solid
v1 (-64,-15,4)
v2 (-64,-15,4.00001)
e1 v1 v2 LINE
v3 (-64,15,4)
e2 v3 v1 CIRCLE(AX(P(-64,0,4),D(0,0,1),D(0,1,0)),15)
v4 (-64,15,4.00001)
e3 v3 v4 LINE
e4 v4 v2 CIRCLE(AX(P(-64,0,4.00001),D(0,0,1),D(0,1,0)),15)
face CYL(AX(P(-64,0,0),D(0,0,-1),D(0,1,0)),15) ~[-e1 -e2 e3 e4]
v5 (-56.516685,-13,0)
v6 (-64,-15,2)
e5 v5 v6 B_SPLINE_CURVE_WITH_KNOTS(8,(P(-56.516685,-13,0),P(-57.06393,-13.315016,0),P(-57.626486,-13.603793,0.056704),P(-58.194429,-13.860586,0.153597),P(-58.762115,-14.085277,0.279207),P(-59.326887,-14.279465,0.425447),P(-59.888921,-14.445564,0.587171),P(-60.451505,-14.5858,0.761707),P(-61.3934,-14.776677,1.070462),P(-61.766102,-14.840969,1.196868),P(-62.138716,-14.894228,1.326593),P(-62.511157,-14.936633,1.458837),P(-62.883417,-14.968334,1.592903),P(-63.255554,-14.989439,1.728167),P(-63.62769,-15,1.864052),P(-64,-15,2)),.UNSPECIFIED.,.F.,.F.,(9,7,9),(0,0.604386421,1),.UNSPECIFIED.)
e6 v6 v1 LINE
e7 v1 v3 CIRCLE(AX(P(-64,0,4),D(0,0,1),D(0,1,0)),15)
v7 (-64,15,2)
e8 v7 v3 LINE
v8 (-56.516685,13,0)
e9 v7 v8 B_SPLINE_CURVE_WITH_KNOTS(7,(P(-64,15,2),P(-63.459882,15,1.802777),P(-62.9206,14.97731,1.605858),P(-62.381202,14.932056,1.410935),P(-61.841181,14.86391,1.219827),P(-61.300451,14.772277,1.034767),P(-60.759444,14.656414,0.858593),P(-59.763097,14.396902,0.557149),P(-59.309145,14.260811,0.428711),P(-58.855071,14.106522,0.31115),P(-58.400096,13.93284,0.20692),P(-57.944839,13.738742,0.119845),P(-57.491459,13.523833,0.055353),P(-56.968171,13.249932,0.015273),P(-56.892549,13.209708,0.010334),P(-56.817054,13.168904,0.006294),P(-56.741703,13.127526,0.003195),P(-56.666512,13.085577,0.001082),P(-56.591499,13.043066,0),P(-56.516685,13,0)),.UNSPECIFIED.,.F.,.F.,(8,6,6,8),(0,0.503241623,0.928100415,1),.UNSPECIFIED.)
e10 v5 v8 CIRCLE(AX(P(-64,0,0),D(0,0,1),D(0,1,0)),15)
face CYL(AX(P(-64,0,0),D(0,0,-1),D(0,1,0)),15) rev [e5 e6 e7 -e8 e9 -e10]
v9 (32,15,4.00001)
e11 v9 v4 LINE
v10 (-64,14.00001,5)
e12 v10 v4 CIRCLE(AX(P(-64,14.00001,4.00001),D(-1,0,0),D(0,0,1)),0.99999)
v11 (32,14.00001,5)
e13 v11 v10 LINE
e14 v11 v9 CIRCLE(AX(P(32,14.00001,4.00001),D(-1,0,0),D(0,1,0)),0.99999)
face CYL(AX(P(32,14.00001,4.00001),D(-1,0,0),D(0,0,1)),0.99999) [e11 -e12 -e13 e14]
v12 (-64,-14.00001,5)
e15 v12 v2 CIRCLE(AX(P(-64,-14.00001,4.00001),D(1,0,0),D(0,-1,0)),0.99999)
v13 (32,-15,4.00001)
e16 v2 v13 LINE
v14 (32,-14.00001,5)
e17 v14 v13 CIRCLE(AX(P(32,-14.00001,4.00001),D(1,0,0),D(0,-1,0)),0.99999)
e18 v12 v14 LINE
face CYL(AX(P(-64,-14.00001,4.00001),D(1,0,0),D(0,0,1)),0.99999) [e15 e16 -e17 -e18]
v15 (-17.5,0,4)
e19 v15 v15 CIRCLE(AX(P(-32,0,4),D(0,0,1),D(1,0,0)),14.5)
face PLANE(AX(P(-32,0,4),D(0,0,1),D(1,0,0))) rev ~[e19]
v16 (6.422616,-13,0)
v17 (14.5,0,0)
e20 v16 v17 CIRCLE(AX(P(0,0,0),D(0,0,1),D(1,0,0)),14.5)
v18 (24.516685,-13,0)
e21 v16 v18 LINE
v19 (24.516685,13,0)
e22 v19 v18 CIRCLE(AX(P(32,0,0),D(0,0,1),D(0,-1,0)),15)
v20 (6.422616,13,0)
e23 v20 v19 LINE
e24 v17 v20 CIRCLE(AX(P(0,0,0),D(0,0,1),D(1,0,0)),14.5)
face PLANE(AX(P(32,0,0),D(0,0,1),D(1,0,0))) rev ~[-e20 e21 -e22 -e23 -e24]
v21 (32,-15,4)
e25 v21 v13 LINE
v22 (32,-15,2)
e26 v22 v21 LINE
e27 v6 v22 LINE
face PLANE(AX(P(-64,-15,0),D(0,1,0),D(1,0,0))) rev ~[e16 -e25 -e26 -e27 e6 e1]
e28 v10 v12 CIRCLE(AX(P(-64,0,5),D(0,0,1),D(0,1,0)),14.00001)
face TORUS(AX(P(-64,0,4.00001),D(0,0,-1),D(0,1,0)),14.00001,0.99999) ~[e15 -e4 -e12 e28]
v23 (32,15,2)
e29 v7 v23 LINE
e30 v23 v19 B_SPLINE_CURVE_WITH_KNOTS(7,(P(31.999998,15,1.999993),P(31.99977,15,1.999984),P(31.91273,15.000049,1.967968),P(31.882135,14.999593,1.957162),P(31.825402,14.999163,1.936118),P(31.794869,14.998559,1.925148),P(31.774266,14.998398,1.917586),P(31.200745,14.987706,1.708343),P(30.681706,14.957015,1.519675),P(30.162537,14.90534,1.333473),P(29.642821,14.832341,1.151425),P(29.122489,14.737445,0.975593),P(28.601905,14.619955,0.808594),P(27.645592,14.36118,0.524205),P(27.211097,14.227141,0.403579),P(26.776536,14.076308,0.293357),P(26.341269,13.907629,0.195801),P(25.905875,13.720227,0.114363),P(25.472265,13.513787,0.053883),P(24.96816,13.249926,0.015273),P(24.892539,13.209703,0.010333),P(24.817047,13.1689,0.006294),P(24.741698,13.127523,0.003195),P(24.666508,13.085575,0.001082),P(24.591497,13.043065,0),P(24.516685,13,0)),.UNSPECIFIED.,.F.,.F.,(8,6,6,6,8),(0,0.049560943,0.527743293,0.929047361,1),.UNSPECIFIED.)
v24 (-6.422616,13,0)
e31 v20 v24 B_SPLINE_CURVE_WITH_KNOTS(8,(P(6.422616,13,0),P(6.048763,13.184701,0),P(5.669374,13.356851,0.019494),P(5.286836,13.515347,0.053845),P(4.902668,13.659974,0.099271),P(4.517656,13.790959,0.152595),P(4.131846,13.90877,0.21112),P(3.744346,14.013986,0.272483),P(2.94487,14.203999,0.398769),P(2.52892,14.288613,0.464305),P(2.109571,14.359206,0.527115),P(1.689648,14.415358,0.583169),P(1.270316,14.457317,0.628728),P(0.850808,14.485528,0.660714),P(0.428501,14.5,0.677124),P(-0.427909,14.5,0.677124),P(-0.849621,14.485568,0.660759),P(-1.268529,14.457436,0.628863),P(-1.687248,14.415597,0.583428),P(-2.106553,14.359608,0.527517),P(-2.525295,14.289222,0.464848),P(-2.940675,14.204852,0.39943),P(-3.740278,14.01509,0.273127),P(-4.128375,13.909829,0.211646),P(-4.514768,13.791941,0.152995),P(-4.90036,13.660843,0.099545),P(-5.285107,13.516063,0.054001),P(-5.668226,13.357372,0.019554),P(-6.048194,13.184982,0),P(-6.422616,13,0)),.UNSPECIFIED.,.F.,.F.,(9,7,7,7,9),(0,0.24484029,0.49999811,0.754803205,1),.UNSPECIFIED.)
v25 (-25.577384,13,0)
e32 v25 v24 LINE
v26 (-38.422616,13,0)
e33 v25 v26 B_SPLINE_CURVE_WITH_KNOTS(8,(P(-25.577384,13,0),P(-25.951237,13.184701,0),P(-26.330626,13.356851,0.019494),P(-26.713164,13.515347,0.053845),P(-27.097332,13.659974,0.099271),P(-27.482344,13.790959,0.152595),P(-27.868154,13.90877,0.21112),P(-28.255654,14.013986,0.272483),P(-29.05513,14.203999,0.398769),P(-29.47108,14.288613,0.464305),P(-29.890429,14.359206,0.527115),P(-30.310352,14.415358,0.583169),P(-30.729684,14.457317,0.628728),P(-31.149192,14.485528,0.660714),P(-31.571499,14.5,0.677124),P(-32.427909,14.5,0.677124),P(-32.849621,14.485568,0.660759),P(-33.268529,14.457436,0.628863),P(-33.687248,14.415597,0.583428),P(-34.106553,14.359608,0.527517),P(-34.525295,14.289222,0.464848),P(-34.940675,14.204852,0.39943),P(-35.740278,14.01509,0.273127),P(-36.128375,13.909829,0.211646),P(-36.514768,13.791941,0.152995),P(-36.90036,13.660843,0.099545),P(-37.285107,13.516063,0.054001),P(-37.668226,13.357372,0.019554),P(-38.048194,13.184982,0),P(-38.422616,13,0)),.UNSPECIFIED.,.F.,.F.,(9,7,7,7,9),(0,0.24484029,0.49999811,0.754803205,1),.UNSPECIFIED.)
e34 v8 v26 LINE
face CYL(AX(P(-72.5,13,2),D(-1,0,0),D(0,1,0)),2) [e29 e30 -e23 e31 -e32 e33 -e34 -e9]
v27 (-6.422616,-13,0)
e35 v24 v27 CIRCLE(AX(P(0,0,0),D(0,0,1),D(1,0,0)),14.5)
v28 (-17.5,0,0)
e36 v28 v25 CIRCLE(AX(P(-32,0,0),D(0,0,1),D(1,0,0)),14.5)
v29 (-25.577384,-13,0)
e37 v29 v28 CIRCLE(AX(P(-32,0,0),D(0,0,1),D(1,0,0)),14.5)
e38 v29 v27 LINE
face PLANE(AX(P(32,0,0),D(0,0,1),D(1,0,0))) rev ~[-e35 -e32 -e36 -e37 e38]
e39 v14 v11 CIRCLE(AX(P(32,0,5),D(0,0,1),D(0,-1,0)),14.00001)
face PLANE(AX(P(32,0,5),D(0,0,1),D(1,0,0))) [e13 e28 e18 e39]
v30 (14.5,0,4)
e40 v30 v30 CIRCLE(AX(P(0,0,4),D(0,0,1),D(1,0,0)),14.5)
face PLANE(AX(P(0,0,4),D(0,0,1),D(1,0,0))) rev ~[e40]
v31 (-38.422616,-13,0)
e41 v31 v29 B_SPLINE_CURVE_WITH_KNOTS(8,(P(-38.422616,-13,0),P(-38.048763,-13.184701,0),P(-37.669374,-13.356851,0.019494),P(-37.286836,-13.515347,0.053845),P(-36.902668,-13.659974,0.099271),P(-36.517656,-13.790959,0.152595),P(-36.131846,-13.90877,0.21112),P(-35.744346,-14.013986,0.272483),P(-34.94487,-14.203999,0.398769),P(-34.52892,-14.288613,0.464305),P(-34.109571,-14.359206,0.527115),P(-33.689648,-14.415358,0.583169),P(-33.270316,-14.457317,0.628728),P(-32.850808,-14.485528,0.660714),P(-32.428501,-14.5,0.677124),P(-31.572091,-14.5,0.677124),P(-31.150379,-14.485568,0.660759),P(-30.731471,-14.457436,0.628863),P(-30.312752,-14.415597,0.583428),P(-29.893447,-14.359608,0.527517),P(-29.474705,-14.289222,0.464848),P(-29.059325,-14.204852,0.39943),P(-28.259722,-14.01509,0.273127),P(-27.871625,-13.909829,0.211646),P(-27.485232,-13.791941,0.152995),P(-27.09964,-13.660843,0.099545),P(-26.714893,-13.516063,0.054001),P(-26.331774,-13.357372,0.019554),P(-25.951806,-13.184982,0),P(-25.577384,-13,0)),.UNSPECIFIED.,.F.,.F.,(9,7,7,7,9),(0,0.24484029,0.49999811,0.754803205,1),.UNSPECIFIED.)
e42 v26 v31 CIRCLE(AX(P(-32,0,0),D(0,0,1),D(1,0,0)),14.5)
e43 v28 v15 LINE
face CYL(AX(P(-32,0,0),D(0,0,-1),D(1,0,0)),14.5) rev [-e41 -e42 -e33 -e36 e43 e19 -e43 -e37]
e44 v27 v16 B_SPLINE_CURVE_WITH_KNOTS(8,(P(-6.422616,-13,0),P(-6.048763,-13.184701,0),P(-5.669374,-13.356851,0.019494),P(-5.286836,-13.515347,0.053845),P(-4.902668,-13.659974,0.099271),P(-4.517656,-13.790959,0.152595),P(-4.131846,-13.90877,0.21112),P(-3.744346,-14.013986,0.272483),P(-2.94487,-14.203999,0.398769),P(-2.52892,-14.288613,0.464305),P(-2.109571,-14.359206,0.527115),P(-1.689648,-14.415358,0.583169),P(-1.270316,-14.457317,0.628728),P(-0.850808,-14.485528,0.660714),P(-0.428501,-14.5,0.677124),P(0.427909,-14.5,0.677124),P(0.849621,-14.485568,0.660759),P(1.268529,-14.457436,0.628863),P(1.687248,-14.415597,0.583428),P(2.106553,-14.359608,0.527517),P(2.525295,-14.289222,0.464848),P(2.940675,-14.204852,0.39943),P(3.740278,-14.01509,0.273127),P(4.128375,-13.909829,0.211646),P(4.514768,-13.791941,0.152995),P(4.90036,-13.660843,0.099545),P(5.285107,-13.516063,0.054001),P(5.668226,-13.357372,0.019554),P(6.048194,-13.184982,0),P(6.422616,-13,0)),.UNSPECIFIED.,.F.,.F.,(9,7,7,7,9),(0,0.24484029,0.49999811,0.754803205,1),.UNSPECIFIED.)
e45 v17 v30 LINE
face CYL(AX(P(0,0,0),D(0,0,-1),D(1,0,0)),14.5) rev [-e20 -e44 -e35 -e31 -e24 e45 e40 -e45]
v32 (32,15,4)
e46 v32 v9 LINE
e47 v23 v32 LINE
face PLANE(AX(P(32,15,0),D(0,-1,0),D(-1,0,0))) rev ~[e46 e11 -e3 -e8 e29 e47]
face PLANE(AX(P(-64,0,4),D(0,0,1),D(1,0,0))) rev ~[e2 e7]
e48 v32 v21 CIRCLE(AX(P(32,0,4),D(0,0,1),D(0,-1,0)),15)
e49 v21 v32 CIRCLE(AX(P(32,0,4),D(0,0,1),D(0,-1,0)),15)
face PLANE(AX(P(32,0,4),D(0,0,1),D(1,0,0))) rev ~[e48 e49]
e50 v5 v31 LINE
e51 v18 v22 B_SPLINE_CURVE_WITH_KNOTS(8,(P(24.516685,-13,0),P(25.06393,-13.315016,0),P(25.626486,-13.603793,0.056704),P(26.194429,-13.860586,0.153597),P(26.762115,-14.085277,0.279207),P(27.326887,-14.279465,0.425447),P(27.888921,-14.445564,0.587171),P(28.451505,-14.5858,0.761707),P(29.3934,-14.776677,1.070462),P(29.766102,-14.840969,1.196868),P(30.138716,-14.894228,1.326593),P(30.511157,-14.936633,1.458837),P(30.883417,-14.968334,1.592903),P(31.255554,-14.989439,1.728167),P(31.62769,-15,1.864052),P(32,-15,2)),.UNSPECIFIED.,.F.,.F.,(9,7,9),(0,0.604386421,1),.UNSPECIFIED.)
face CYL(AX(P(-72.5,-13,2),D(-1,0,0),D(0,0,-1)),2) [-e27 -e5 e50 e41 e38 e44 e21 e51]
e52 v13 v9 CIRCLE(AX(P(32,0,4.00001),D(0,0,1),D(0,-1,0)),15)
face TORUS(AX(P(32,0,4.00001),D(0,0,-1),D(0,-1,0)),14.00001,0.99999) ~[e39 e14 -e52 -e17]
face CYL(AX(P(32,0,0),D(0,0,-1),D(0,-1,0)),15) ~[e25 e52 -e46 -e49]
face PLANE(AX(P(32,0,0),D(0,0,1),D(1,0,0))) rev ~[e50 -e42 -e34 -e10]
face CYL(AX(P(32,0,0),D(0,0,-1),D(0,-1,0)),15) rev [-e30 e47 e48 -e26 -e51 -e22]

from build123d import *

# Parameters (mm, degrees)
F0_R        = 14.5
F1_DEPTH    = 5
F2_DEPTH    = 4
F3_T1_DEPTH = 113
F4_R        = 0.99999


# Not quite as in the source:
# - a fillet or chamfer that OpenCascade refuses, or shapes differently, is made with other operations: its cross-section is extruded or revolved along the edge and cut away or added
# - a fillet or chamfer is up to 0.001 mm smaller than in the source, because OpenCascade refuses the exact size


with BuildPart() as f1:
    # F0 (on Top) → F1 (new body)
    with BuildSketch(Plane.XY):
        with BuildLine():
            ThreePointArc((47, 0), (42.6066017178, 10.6066017178), (32, 15))
            ThreePointArc((32, 15), (17, 0), (32, -15))
            ThreePointArc((32, -15), (42.6066017178, -10.6066017178), (47, 0))
        make_face()
        with BuildLine():
            ThreePointArc((-64, 15), (-53.3933982822, 10.6066017178), (-49, 0))
            ThreePointArc((-49, 0), (-53.3933982822, -10.6066017178), (-64, -15))
            Line((-64, -15), (32, -15))
            ThreePointArc((32, -15), (17, 0), (32, 15))
            Line((32, 15), (-64, 15))
        make_face()
        with Locations((-32, 0)):
            Circle(F0_R, mode=Mode.SUBTRACT)
        Circle(F0_R, mode=Mode.SUBTRACT)
        Circle(F0_R)
        with Locations((-32, 0)):
            Circle(F0_R)
        with BuildLine():
            ThreePointArc((-64, -15), (-53.3933982822, -10.6066017178), (-49, 0))
            ThreePointArc((-49, 0), (-53.3933982822, 10.6066017178), (-64, 15))
            ThreePointArc((-64, 15), (-79, 0), (-64, -15))
        make_face()
    extrude(amount=F1_DEPTH)

    # F0 (on Top) → F2 (cut)
    with BuildSketch(Plane.XY):
        with BuildLine():
            ThreePointArc((47, 0), (42.6066017178, 10.6066017178), (32, 15))
            ThreePointArc((32, 15), (17, 0), (32, -15))
            ThreePointArc((32, -15), (42.6066017178, -10.6066017178), (47, 0))
        make_face()
        Circle(F0_R)
        with Locations((-32, 0)):
            Circle(F0_R)
        with BuildLine():
            ThreePointArc((-64, -15), (-53.3933982822, -10.6066017178), (-49, 0))
            ThreePointArc((-49, 0), (-53.3933982822, 10.6066017178), (-64, 15))
            ThreePointArc((-64, 15), (-79, 0), (-64, -15))
        make_face()
    extrude(amount=F2_DEPTH, mode=Mode.SUBTRACT)

    # F3: fillet of radius 2 on 2 edges, made by hand

    # F3_s2 → F3_t1 (cut)
    with BuildSketch(Plane.YZ.offset(-72.5)):
        with BuildLine():
            ThreePointArc((-13, 0), (-14.4142135624, 0.5857864376), (-15, 2))
            Line((-15, 2), (-15, 0))
            Line((-15, 0), (-13, 0))
        make_face()
        with BuildLine():
            ThreePointArc((15, 2), (14.4142135624, 0.5857864376), (13, 0))
            Line((13, 0), (15, 0))
            Line((15, 0), (15, 2))
        make_face()
    extrude(amount=F3_T1_DEPTH, mode=Mode.SUBTRACT)

    # F4 (radius 1 in the source; OpenCascade refuses exactly that, so slightly less here)
    f4_edges = [f1.edges().sort_by_distance(p)[0] for p in [
        (47, 0, 5),
        (-16, 15, 5),
        (-79, 0, 5),
        (-16, -15, 5),
    ]]
    fillet(f4_edges, radius=F4_R)


solid = f1.part
